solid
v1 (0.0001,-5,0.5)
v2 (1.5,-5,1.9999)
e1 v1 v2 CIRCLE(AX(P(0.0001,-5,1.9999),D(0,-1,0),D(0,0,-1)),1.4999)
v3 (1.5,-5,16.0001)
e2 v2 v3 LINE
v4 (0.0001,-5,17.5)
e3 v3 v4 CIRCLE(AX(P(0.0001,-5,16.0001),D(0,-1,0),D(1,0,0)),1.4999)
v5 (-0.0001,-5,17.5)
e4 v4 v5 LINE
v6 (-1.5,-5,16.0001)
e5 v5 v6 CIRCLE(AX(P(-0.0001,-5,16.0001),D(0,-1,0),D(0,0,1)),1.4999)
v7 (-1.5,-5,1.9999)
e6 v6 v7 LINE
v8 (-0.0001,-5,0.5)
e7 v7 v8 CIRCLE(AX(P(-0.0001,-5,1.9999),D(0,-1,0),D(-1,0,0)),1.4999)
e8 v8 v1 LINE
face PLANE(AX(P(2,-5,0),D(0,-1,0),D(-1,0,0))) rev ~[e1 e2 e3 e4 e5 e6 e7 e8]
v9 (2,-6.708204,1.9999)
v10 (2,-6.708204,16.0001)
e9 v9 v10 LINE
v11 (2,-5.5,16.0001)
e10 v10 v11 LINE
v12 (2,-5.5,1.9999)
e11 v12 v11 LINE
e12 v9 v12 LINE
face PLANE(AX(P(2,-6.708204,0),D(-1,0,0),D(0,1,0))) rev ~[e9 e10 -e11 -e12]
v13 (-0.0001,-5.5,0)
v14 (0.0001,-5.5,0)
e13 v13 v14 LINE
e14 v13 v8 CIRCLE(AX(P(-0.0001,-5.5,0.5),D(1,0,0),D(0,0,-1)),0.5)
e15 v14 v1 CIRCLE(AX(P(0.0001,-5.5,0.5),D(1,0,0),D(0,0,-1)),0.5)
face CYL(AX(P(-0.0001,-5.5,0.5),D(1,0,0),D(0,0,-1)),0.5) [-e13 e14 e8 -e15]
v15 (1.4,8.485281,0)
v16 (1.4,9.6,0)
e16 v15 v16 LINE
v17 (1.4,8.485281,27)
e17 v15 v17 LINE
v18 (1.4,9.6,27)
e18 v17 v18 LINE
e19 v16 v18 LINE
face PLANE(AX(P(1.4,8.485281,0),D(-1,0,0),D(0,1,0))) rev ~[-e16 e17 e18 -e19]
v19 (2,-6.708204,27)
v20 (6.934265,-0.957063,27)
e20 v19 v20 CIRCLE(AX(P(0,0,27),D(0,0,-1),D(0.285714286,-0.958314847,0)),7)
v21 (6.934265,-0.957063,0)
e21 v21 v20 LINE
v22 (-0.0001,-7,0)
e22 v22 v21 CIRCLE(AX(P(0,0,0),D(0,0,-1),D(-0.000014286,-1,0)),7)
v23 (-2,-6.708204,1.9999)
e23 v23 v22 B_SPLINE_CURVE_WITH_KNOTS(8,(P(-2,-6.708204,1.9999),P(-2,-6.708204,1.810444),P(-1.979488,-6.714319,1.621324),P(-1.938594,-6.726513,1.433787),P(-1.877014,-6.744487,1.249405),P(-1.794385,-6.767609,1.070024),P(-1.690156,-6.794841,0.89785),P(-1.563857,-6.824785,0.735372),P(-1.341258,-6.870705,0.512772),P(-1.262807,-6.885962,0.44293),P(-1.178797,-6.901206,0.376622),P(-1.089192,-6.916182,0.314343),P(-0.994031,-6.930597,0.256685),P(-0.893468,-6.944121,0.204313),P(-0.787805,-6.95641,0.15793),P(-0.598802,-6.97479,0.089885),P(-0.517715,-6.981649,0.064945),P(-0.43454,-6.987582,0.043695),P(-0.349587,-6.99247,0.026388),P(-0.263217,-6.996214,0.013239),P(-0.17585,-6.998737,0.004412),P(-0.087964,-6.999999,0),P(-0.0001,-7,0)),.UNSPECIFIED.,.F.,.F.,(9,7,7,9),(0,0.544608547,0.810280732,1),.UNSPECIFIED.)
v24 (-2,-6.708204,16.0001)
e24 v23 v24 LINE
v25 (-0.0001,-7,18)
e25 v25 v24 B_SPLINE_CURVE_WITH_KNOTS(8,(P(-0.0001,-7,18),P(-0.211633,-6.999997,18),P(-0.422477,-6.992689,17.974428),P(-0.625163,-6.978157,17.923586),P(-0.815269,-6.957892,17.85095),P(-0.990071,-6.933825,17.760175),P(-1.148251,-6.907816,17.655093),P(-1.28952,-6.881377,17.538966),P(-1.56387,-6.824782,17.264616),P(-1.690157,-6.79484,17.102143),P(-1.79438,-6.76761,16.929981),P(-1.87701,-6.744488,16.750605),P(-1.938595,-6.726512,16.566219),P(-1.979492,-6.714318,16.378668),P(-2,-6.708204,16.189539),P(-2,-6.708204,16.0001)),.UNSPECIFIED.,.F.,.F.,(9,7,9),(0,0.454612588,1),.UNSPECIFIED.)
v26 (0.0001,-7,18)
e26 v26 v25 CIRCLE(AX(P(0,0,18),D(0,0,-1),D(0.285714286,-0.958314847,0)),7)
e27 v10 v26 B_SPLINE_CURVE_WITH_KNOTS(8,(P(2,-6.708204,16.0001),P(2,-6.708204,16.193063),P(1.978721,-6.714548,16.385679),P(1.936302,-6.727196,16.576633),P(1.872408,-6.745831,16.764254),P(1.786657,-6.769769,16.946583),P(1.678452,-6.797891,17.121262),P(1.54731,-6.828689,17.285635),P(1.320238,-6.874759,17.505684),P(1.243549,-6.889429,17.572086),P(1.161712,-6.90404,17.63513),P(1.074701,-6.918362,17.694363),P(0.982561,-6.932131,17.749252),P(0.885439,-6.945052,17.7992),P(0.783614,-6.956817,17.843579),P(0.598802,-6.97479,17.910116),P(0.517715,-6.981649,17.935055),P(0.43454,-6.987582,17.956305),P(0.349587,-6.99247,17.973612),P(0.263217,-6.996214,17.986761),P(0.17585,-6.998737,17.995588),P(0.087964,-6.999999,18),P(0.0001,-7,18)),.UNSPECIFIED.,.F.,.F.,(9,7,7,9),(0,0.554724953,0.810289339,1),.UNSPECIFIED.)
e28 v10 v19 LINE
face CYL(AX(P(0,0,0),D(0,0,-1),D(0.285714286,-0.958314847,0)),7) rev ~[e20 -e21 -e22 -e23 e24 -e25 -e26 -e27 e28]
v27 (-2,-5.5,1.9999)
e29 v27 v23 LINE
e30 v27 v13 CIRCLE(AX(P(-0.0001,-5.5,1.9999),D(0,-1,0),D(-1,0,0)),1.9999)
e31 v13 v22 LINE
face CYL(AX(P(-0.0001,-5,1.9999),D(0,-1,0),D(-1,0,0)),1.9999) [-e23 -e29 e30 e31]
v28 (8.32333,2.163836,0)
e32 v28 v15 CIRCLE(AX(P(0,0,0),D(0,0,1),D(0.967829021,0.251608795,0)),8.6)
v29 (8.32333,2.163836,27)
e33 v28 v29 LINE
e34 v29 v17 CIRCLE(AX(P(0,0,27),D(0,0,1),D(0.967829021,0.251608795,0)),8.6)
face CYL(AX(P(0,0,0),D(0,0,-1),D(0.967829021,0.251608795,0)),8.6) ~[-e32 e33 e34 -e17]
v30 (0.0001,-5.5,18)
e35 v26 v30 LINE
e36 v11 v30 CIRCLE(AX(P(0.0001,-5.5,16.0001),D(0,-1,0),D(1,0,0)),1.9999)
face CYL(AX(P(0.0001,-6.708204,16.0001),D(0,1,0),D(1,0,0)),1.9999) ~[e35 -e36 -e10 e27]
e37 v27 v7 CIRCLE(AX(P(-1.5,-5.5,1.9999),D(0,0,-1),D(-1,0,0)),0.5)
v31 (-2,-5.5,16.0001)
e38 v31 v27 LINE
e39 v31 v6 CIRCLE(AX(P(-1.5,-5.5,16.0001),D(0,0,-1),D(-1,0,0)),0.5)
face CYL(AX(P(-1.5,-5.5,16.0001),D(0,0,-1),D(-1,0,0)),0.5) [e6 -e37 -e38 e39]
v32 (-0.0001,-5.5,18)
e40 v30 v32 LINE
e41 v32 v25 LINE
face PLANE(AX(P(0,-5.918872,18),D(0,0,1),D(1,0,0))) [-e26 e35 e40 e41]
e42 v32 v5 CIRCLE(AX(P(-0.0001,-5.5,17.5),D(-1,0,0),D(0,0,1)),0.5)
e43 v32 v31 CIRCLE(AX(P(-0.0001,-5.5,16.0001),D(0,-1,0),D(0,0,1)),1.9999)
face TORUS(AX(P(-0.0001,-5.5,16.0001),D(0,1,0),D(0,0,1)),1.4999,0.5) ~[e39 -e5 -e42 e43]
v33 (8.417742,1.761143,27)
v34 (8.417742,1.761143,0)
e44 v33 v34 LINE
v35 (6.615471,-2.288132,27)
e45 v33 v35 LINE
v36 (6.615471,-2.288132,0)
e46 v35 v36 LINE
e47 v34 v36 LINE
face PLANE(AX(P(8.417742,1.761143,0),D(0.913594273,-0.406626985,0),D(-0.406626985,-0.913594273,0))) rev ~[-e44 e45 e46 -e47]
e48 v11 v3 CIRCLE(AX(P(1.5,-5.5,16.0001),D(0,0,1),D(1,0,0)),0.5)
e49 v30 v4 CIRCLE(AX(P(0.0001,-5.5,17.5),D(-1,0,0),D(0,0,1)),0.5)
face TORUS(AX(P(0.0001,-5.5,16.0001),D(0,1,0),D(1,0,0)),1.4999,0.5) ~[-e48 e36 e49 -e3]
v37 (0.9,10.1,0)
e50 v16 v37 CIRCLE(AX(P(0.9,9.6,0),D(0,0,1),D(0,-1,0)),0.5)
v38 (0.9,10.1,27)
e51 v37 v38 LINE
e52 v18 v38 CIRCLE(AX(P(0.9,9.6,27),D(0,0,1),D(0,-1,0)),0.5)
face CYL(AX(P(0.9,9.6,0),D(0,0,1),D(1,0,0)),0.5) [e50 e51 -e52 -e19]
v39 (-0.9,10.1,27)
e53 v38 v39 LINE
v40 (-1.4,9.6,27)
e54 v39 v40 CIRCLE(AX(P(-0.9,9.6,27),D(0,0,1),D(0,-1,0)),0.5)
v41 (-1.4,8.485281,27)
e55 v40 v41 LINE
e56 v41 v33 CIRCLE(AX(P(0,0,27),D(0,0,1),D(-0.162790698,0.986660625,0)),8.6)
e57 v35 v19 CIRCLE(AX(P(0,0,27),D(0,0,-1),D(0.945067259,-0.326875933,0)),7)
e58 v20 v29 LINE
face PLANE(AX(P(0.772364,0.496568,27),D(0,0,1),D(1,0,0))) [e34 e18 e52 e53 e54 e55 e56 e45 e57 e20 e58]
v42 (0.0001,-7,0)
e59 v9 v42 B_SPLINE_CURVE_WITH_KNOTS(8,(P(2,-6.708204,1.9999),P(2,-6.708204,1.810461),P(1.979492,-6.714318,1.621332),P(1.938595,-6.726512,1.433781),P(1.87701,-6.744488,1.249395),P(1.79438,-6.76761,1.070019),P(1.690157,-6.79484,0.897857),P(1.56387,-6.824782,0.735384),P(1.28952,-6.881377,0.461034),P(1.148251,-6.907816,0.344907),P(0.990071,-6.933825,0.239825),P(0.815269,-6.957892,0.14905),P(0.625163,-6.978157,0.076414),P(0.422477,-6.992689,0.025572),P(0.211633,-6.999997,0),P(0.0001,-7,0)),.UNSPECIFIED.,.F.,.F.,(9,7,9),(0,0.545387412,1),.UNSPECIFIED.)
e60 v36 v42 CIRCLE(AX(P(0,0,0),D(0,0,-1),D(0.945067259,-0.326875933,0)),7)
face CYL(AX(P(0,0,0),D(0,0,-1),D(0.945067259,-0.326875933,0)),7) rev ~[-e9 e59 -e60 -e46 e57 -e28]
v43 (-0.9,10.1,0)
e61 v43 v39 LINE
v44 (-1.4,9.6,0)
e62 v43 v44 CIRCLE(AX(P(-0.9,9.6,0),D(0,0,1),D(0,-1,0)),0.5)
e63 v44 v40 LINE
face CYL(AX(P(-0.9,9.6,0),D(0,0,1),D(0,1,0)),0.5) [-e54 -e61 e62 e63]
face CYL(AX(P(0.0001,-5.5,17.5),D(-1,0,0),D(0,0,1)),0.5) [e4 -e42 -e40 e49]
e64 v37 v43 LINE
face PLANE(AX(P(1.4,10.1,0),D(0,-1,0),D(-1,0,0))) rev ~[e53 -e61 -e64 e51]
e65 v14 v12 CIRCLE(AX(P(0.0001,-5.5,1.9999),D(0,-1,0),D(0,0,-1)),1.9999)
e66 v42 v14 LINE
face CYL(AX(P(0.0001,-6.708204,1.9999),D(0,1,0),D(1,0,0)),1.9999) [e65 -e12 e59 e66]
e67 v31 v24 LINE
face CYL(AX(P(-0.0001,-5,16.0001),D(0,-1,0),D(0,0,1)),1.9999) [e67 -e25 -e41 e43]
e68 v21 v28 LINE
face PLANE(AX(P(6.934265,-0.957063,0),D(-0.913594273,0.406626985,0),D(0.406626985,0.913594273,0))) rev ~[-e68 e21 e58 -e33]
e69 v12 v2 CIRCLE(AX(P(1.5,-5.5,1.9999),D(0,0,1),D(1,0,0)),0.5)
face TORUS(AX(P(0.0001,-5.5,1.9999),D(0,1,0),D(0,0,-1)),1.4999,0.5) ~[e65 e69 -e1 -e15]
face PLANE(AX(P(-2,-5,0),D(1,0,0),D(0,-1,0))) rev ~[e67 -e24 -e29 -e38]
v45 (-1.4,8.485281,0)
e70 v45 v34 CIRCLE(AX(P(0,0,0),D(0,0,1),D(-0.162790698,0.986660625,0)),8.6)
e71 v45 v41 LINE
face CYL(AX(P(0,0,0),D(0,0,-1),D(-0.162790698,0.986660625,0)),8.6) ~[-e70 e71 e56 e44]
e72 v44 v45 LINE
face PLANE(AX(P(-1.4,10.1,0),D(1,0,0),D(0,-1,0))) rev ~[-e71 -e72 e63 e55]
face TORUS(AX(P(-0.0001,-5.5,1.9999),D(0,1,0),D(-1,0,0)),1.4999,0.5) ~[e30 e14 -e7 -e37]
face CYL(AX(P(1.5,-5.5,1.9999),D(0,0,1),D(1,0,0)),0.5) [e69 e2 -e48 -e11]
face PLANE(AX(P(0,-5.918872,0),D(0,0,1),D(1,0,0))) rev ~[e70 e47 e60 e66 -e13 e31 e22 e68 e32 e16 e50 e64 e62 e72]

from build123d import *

# Parameters (mm, degrees)
F1_DEPTH = 27
F2_DEPTH = 18
F3_R     = 1.9999
F4_R     = 0.5


# Not quite as in the source:
# - a fillet or chamfer is up to 0.001 mm smaller than in the source, because OpenCascade refuses the exact size


with BuildPart() as f1:
    # F0 (on Top) → F1 (new body)
    with BuildSketch(Plane.XY):
        with BuildLine():
            ThreePointArc((6.6154708154, -2.2881315283), (4.8415745742, -5.0556063576), (2, -6.7082039325))
            ThreePointArc((2, -6.7082039325), (0, -7), (-2, -6.7082039325))
            ThreePointArc((-2, -6.7082039325), (-3.7888849897, 5.8859451692), (6.9342650073, -0.9570625938))
            Line((6.9342650073, -0.9570625938), (8.3233295817, 2.1638356393))
            ThreePointArc((8.3233295817, 2.1638356393), (5.7987889756, 6.3509091015), (1.4, 8.4852813742))
            Line((1.4, 8.4852813742), (1.4, 10.1))
            Line((1.4, 10.1), (-1.4, 10.1))
            Line((-1.4, 10.1), (-1.4, 8.4852813742))
            ThreePointArc((-1.4, 8.4852813742), (-4.8595970429, -7.0953728994), (8.4177416777, 1.7611431082))
            Line((8.4177416777, 1.7611431082), (6.6154708154, -2.2881315283))
        make_face()
    extrude(amount=F1_DEPTH)

    # F0 (on Top) → F2 (join)
    with BuildSketch(Plane.XY):
        with BuildLine():
            ThreePointArc((-2, -6.7082039325), (0, -7), (2, -6.7082039325))
            Line((2, -6.7082039325), (2, -5))
            Line((2, -5), (-2, -5))
            Line((-2, -5), (-2, -6.7082039325))
        make_face()
        with BuildLine():
            ThreePointArc((6.6154708154, -2.2881315283), (4.8415745742, -5.0556063576), (2, -6.7082039325))
            ThreePointArc((2, -6.7082039325), (0, -7), (-2, -6.7082039325))
            ThreePointArc((-2, -6.7082039325), (-3.7888849897, 5.8859451692), (6.9342650073, -0.9570625938))
            Line((6.9342650073, -0.9570625938), (8.3233295817, 2.1638356393))
            ThreePointArc((8.3233295817, 2.1638356393), (5.7987889756, 6.3509091015), (1.4, 8.4852813742))
            Line((1.4, 8.4852813742), (1.4, 10.1))
            Line((1.4, 10.1), (-1.4, 10.1))
            Line((-1.4, 10.1), (-1.4, 8.4852813742))
            ThreePointArc((-1.4, 8.4852813742), (-4.8595970429, -7.0953728994), (8.4177416777, 1.7611431082))
            Line((8.4177416777, 1.7611431082), (6.6154708154, -2.2881315283))
        make_face()
    extrude(amount=F2_DEPTH)

    # F3 (radius 2 in the source; OpenCascade refuses exactly that, so slightly less here)
    f3_edges = [f1.edges().sort_by_distance(p)[0] for p in [
        (2, -5.854102, 18),
        (-2, -5.854102, 18),
        (2, -5.854102, 0),
        (-2, -5.854102, 0),
    ]]
    fillet(f3_edges, radius=F3_R)

    # F4
    f4_edges = [f1.edges().sort_by_distance(p)[0] for p in [
        (2, -5, 9),
        (1.4, 10.1, 13.5),
        (-1.4, 10.1, 13.5),
    ]]
    fillet(f4_edges, radius=F4_R)


solid = f1.part
